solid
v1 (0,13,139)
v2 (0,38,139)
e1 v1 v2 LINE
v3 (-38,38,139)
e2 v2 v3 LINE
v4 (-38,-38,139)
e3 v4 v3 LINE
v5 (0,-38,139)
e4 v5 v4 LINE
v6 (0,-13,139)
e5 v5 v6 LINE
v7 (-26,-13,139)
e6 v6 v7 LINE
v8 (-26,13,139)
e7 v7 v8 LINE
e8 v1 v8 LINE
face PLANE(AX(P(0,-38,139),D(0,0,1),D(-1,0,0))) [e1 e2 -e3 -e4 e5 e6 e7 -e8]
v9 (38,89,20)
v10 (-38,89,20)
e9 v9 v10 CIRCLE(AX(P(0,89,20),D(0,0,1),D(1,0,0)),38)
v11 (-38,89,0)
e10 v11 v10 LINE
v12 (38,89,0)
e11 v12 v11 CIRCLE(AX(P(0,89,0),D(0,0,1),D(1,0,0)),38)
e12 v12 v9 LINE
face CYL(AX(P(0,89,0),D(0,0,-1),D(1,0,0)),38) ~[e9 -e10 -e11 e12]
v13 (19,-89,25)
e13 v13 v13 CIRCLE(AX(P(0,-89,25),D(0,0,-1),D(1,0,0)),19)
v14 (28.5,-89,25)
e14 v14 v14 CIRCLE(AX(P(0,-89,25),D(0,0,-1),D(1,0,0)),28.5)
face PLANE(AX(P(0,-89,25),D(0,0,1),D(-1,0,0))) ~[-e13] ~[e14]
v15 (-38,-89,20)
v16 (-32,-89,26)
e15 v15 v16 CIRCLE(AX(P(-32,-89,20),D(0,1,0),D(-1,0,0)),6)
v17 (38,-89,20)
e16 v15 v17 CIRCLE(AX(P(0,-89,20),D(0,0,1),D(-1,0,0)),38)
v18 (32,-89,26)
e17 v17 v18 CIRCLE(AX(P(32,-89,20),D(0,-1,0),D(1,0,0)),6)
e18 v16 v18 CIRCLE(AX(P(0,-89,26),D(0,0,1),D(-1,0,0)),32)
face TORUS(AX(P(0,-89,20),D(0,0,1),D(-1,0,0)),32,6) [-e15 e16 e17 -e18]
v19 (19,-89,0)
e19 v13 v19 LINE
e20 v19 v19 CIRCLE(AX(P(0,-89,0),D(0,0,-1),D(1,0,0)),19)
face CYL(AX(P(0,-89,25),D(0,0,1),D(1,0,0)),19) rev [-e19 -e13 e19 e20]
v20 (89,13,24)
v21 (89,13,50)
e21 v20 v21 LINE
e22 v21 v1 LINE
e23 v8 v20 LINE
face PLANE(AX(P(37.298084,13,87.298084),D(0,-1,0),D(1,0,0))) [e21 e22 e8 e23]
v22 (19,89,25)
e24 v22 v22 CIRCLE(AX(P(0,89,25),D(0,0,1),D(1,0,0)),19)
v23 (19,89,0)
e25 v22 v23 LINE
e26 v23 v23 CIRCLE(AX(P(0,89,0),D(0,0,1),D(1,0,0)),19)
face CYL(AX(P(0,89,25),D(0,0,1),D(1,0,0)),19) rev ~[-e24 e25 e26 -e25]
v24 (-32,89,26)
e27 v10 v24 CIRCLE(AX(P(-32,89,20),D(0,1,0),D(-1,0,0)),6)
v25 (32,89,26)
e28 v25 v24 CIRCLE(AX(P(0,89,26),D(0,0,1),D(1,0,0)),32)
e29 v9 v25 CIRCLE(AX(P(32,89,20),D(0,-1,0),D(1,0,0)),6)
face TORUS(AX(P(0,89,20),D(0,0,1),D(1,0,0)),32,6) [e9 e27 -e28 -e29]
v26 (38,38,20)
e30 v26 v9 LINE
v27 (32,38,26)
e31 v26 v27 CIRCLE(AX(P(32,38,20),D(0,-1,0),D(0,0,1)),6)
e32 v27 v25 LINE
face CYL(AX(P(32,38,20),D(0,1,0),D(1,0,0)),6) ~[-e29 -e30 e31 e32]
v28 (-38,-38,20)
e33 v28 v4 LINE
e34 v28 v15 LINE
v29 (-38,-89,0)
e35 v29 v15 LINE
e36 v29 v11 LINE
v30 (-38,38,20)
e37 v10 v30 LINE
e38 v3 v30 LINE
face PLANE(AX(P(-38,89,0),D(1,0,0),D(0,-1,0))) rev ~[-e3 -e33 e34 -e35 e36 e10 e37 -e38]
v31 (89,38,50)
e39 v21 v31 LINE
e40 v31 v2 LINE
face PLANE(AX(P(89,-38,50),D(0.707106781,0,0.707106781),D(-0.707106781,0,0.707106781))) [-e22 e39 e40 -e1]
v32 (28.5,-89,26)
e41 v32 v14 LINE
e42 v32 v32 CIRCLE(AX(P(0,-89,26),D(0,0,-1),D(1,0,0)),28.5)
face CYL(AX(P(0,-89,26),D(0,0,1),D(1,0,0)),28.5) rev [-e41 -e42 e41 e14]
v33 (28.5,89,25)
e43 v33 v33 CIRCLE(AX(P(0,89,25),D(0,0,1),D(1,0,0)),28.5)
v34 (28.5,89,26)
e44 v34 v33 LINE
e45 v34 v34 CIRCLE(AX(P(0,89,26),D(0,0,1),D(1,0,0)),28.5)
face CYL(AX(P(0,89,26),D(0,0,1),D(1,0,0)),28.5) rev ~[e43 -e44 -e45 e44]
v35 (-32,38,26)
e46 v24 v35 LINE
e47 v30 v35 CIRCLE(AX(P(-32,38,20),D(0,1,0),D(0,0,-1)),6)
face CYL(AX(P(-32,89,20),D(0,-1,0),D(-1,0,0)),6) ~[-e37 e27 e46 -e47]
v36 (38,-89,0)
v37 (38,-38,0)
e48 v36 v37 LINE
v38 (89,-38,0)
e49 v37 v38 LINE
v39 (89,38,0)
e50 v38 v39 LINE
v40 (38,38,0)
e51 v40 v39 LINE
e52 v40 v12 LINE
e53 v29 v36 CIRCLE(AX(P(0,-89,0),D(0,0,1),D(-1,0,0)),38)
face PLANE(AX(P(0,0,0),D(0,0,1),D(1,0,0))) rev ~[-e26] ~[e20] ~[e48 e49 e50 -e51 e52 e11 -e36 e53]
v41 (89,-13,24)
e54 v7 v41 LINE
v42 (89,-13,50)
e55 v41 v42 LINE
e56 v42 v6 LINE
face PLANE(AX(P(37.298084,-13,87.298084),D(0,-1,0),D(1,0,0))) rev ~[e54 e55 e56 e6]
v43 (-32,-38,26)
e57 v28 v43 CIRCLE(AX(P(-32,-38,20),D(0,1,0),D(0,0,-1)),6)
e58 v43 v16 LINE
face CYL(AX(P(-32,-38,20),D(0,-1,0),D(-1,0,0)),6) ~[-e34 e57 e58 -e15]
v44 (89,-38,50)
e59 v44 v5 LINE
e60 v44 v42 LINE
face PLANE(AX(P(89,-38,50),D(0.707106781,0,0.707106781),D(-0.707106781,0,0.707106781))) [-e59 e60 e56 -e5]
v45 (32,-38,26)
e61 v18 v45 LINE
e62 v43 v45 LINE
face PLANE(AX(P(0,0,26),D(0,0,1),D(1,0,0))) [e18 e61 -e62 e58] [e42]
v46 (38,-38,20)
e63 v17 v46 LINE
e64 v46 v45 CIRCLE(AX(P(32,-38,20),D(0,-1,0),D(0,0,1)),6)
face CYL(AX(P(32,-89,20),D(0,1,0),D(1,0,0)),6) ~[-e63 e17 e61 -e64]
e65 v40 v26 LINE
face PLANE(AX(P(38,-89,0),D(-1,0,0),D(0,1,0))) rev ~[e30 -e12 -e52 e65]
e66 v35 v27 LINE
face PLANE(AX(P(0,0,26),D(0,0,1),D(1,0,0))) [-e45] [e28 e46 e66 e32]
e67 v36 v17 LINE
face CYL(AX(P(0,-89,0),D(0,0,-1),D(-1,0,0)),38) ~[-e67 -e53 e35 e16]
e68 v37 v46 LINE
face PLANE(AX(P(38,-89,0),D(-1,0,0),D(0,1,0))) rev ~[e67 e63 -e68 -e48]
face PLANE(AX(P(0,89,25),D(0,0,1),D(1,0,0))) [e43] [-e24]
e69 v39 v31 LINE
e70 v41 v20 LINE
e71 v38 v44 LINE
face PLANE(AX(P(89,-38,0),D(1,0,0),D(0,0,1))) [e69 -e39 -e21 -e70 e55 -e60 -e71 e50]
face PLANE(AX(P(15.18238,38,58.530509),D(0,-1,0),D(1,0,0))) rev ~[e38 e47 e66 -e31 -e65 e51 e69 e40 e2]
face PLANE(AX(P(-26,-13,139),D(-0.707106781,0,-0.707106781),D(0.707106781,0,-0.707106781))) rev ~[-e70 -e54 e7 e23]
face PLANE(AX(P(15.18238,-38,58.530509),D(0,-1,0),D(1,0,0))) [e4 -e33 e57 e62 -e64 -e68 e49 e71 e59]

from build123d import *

# Parameters (mm, degrees)
F1_DEPTH  = 26
F5_DEPTH  = 76
F8_DEPTH  = 26
F9_R      = 28.5
F10_DEPTH = 1
F11_R     = 19
F12_DEPTH = 25
F13_R     = 6


# Not quite as in the source:
# - a pattern or mirror of a feature is missing from the dataset's text; its kind, count and spacing are read off the source's solid


with BuildPart() as f1:
    # F0 (on Top) → F1 (new body)
    with BuildSketch(Plane.XY):
        with BuildLine():
            Line((38, -89), (38, 89))
            ThreePointArc((38, 89), (0, 127), (-38, 89))
            Line((-38, 89), (-38, -89))
            ThreePointArc((-38, -89), (0, -127), (38, -89))
        make_face()
    extrude(amount=F1_DEPTH)

    # F4 (on offset) → F5 (join)
    with BuildSketch(Plane.XZ.offset(38)):
        Polygon((-38, 50), (-38, 0), (89, 0), (89, 50), (0, 139), (-38, 139), align=None)
    extrude(amount=-F5_DEPTH)

    # F7 (on offset) → F8 (cut)
    with BuildSketch(Plane.XZ.offset(13)):
        Polygon((89, 50), (0, 139), (-26, 139), (89, 24), align=None)
    extrude(amount=-F8_DEPTH, mode=Mode.SUBTRACT)

    # F9 (on face) → F10 (cut)
    with BuildSketch(Plane.XY.offset(26)):
        with Locations((0, 89)):
            Circle(F9_R)
    f10 = extrude(amount=-F10_DEPTH, mode=Mode.SUBTRACT)

    # F10_copies: F10 across plane
    add(f10.mirror(Plane(origin=(0, 0, 0), x_dir=(0, 0, -1), z_dir=(0, -1, 0))), mode=Mode.SUBTRACT)

    # F11 (on face) → F12 (cut, through all)
    with BuildSketch(Plane.XY.offset(25)):
        with Locations((0, 89)):
            Circle(F11_R)
    f12 = extrude(amount=-F12_DEPTH, mode=Mode.SUBTRACT)

    # F12_copies: F12 across plane
    add(f12.mirror(Plane(origin=(0, 0, 0), x_dir=(0, 0, -1), z_dir=(0, -1, 0))), mode=Mode.SUBTRACT)

    # F13
    f13_edges = [f1.edges().sort_by_distance(p)[0] for p in [
        (38, -63.5, 26),
        (38, 63.5, 26),
        (0, -127, 26),
        (-38, -63.5, 26),
        (-38, 63.5, 26),
        (0, 127, 26),
    ]]
    fillet(f13_edges, radius=F13_R)


solid = f1.part
